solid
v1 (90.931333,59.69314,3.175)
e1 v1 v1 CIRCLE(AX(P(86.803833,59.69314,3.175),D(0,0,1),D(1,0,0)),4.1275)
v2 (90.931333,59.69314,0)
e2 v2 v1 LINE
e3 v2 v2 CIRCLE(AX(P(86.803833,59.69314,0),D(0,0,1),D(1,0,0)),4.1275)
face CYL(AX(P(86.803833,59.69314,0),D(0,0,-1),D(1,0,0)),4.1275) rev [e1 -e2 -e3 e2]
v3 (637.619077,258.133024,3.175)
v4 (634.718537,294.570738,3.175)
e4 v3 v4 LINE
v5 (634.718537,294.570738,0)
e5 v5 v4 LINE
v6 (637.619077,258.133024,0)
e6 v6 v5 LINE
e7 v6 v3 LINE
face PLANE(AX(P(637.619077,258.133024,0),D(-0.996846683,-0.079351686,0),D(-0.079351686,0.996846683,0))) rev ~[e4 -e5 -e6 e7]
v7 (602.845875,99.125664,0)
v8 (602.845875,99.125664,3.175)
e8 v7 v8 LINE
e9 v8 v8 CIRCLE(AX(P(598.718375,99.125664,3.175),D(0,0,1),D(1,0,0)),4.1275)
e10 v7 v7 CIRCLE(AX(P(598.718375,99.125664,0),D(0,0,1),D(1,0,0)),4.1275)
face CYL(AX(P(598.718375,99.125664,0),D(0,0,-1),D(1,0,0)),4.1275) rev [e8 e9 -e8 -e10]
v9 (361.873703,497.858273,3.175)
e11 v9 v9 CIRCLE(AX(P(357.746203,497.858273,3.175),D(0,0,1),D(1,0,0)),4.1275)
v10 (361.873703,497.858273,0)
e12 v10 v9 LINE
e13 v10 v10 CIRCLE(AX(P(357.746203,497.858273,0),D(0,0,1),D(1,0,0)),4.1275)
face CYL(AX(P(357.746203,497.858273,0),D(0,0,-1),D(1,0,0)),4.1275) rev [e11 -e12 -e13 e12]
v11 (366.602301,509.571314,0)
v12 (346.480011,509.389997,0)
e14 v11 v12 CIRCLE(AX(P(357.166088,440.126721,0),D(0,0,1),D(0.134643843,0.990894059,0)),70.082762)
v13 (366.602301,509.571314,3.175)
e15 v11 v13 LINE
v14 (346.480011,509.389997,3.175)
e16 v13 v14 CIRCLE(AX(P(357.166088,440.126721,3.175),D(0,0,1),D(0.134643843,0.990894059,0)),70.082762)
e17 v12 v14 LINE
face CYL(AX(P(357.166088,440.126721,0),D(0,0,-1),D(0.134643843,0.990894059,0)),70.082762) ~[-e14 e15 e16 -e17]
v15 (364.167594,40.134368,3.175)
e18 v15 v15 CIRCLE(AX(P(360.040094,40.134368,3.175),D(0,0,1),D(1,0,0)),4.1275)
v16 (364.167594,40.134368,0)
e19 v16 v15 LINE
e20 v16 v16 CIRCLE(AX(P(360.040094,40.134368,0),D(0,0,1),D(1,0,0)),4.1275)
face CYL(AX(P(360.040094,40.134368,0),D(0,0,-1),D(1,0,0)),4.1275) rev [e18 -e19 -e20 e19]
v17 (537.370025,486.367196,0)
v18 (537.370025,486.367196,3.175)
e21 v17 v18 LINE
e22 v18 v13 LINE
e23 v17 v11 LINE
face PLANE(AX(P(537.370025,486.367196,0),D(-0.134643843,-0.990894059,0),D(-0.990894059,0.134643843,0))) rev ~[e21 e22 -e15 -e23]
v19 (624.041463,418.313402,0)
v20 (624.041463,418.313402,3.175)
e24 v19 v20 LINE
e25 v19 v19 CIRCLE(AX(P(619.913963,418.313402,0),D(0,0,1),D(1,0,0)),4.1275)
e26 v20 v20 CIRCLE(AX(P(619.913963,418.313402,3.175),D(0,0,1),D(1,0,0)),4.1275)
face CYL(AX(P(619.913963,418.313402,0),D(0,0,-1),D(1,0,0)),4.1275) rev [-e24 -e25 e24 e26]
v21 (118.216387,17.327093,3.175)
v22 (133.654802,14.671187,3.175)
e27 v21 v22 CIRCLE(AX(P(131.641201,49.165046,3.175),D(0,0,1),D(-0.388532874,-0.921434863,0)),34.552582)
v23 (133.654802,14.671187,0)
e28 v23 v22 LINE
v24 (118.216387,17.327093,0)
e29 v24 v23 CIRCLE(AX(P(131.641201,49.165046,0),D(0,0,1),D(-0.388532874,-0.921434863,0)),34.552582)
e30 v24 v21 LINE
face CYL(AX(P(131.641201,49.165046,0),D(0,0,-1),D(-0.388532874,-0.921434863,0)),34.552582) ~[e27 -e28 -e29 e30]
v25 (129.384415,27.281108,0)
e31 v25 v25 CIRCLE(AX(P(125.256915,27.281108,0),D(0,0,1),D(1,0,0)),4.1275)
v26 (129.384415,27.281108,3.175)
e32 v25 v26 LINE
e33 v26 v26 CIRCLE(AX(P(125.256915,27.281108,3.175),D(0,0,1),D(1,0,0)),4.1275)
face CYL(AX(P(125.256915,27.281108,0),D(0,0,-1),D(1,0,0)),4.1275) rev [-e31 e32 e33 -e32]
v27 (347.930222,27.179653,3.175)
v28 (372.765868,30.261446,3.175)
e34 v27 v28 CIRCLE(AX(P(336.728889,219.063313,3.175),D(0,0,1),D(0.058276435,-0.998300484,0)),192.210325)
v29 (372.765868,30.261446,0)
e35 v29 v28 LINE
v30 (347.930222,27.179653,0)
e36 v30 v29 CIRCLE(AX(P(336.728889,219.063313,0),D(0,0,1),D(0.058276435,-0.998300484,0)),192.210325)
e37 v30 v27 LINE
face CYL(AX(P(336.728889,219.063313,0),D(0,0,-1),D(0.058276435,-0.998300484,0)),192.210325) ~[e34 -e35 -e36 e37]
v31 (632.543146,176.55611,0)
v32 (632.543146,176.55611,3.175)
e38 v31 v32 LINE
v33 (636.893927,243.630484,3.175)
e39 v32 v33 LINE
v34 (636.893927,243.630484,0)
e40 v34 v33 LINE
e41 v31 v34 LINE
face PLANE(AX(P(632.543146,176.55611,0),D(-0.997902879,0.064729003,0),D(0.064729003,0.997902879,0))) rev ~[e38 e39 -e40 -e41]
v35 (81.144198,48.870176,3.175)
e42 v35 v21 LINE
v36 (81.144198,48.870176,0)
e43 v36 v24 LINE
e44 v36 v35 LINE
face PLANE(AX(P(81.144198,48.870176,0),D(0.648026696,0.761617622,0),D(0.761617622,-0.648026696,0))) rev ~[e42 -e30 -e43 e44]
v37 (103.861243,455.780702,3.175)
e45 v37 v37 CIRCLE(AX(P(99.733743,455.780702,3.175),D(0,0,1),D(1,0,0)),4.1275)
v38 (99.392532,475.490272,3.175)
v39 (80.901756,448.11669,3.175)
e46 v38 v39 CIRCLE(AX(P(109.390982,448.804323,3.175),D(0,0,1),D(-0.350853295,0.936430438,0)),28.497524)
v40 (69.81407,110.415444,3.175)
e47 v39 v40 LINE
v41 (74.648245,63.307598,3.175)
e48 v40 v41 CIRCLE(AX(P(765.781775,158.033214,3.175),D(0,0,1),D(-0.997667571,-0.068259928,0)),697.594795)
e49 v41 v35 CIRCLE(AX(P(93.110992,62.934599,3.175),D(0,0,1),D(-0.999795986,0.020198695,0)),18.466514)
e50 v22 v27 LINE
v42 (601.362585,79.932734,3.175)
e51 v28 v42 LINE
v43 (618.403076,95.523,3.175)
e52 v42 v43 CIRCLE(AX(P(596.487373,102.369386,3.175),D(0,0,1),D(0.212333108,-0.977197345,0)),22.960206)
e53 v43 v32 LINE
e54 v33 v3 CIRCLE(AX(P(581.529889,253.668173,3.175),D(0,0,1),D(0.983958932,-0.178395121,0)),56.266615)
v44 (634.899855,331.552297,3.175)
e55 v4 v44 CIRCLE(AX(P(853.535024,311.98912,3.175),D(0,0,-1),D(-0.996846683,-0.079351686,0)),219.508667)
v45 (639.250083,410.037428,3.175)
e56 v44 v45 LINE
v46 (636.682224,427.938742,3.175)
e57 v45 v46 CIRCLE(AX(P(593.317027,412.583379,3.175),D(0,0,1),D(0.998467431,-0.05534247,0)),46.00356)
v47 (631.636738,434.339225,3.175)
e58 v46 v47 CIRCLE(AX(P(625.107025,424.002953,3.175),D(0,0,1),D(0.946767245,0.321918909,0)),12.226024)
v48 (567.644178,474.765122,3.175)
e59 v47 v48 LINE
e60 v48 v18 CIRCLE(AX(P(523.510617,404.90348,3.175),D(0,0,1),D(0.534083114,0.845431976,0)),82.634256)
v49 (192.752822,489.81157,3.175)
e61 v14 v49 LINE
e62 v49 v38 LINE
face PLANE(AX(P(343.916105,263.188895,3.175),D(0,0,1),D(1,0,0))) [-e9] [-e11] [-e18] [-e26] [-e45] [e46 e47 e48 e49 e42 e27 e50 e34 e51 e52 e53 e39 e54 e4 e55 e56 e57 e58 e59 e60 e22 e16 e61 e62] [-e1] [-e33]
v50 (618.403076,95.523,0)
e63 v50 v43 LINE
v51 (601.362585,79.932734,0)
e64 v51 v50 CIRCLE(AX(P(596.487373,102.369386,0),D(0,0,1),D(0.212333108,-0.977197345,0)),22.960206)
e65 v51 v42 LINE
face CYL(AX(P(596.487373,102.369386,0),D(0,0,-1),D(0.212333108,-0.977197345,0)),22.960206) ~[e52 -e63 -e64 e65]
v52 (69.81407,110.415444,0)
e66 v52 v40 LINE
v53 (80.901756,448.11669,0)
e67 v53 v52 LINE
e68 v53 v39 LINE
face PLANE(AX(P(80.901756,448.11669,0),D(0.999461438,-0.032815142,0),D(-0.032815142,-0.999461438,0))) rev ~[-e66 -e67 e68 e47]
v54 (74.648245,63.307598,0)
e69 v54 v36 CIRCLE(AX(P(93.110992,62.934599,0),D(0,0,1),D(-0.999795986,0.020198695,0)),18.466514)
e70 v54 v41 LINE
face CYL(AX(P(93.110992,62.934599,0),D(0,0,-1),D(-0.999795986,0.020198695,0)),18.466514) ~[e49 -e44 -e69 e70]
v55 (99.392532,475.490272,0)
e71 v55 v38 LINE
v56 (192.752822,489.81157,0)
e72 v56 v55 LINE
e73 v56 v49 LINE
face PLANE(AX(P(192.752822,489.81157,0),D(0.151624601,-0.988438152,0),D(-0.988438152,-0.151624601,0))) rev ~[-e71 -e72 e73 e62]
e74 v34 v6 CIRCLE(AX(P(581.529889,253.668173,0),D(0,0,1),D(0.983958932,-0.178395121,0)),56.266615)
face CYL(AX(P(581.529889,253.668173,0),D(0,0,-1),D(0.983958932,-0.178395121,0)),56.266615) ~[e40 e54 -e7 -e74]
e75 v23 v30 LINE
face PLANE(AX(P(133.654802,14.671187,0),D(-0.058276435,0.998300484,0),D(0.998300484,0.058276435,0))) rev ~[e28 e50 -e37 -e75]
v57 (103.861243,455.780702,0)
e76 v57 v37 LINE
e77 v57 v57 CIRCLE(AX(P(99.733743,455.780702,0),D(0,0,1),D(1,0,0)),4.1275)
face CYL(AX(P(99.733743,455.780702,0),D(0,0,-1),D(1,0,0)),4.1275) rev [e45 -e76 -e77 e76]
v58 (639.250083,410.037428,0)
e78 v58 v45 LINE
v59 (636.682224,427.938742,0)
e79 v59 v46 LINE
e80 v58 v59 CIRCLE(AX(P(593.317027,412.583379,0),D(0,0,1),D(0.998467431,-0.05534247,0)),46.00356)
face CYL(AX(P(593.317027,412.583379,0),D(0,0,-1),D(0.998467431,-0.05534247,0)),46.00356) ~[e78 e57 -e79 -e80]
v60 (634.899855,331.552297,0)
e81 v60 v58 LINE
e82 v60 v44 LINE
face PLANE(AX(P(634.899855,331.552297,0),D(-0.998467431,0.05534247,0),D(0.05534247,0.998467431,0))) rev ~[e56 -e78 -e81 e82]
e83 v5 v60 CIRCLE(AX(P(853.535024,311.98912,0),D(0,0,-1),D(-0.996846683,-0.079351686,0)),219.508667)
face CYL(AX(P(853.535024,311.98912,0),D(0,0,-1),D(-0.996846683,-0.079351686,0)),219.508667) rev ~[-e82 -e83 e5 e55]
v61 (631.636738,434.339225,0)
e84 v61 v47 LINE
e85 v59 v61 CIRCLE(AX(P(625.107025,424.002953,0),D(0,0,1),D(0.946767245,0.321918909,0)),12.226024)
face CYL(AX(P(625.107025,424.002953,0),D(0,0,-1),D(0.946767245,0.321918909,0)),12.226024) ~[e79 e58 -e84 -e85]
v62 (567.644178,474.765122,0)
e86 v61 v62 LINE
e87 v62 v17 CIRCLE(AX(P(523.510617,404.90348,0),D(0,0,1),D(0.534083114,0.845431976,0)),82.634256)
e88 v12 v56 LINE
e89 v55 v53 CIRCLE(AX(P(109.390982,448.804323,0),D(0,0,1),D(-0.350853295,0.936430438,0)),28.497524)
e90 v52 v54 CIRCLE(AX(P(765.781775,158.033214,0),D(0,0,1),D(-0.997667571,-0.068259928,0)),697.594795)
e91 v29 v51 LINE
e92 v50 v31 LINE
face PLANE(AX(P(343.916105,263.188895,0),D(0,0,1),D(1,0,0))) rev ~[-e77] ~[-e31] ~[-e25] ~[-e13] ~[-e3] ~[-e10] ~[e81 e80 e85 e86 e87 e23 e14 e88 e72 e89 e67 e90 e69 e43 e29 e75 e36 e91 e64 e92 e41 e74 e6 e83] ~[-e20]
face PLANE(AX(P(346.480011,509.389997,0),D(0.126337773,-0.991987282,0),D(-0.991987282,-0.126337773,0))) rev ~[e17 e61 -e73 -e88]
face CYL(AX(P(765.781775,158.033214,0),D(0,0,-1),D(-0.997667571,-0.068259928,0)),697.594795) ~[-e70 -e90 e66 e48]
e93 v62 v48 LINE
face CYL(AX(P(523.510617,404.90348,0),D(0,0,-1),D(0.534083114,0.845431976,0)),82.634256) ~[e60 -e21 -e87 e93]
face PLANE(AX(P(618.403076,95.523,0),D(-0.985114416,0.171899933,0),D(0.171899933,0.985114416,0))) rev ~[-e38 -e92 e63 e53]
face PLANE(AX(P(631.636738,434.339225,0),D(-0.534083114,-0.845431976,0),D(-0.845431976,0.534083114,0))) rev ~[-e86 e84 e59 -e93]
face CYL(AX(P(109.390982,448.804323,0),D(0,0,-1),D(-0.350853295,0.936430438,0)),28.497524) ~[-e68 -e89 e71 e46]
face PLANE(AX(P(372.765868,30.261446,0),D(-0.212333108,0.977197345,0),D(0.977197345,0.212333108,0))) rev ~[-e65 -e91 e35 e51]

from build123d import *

# Parameters (mm, degrees)
F0_R     = 4.1275
F1_DEPTH = 3.175


# Not quite as in the source:
# - a feature names something its author has since deleted; it is built from what else it names


with BuildPart() as f1:
    # F0 (on Top) → F1 (new body)
    with BuildSketch(Plane.XY):
        with BuildLine():
            Line((81.1441976903, 48.870176137), (118.2163868425, 17.3270926481))
            ThreePointArc((118.2163868425, 17.3270926481), (125.7830950318, 15.1126819317), (133.6548019526, 14.6711869767))
            Line((133.6548019526, 14.6711869767), (347.9302216647, 27.1796528851))
            ThreePointArc((347.9302216647, 27.1796528851), (360.3982548534, 28.3159145983), (372.7658678172, 30.2614458507))
            Line((372.7658678172, 30.2614458507), (601.3625849364, 79.9327344304))
            ThreePointArc((601.3625849364, 79.9327344304), (611.9858366517, 85.4292367374), (618.4030760406, 95.5229998236))
            Line((618.4030760406, 95.5229998236), (632.5431455253, 176.5561104422))
            Line((632.5431455253, 176.5561104422), (636.893926966, 243.6304838067))
            ThreePointArc((636.893926966, 243.6304838067), (637.7262973987, 250.8582634049), (637.6190770743, 258.1330240374))
            Line((637.6190770743, 258.1330240374), (634.718536759, 294.5707376489))
            ThreePointArc((634.718536759, 294.5707376489), (634.0289947151, 313.0653425318), (634.89985466, 331.5522968769))
            Line((634.89985466, 331.5522968769), (639.2500827298, 410.037428213))
            ThreePointArc((639.2500827298, 410.037428213), (638.8544702471, 419.1155099086), (636.6822238963, 427.938741873))
            ThreePointArc((636.6822238963, 427.938741873), (634.7085093964, 431.5717815797), (631.6367376922, 434.3392253523))
            Line((631.6367376922, 434.3392253523), (567.6441777823, 474.7651219969))
            ThreePointArc((567.6441777823, 474.7651219969), (553.0816862682, 482.0654658914), (537.3700250266, 486.3671959048))
            Line((537.3700250266, 486.3671959048), (366.6023005126, 509.5713139182))
            ThreePointArc((366.6023005126, 509.5713139182), (356.5346140159, 510.2066384634), (346.480010855, 509.3899965888))
            Line((346.480010855, 509.3899965888), (192.7528221486, 489.8115695124))
            Line((192.7528221486, 489.8115695124), (99.3925322173, 475.4902721053))
            ThreePointArc((99.3925322173, 475.4902721053), (85.7762927803, 464.7559785435), (80.9017557977, 448.1166899806))
            Line((80.9017557977, 448.1166899806), (69.8140699742, 110.4154438382))
            ThreePointArc((69.8140699742, 110.4154438382), (71.8313111538, 86.8204891023), (74.6482450841, 63.3075982934))
            ThreePointArc((74.6482450841, 63.3075982934), (76.2705931102, 55.3574544062), (81.1441976903, 48.870176137))
        make_face()
        with Locations((125.2569147965, 27.2811080985)):
            Circle(F0_R, mode=Mode.SUBTRACT)
        with Locations((86.803833318, 59.6931402198)):
            Circle(F0_R, mode=Mode.SUBTRACT)
        with Locations((360.0400942892, 40.1343675154)):
            Circle(F0_R, mode=Mode.SUBTRACT)
        with Locations((598.7183749899, 99.1256637739)):
            Circle(F0_R, mode=Mode.SUBTRACT)
        with Locations((99.7337432835, 455.780702147)):
            Circle(F0_R, mode=Mode.SUBTRACT)
        with Locations((357.7462032552, 497.8582725917)):
            Circle(F0_R, mode=Mode.SUBTRACT)
        with Locations((619.9139634468, 418.3134020176)):
            Circle(F0_R, mode=Mode.SUBTRACT)
    extrude(amount=F1_DEPTH)


solid = f1.part
